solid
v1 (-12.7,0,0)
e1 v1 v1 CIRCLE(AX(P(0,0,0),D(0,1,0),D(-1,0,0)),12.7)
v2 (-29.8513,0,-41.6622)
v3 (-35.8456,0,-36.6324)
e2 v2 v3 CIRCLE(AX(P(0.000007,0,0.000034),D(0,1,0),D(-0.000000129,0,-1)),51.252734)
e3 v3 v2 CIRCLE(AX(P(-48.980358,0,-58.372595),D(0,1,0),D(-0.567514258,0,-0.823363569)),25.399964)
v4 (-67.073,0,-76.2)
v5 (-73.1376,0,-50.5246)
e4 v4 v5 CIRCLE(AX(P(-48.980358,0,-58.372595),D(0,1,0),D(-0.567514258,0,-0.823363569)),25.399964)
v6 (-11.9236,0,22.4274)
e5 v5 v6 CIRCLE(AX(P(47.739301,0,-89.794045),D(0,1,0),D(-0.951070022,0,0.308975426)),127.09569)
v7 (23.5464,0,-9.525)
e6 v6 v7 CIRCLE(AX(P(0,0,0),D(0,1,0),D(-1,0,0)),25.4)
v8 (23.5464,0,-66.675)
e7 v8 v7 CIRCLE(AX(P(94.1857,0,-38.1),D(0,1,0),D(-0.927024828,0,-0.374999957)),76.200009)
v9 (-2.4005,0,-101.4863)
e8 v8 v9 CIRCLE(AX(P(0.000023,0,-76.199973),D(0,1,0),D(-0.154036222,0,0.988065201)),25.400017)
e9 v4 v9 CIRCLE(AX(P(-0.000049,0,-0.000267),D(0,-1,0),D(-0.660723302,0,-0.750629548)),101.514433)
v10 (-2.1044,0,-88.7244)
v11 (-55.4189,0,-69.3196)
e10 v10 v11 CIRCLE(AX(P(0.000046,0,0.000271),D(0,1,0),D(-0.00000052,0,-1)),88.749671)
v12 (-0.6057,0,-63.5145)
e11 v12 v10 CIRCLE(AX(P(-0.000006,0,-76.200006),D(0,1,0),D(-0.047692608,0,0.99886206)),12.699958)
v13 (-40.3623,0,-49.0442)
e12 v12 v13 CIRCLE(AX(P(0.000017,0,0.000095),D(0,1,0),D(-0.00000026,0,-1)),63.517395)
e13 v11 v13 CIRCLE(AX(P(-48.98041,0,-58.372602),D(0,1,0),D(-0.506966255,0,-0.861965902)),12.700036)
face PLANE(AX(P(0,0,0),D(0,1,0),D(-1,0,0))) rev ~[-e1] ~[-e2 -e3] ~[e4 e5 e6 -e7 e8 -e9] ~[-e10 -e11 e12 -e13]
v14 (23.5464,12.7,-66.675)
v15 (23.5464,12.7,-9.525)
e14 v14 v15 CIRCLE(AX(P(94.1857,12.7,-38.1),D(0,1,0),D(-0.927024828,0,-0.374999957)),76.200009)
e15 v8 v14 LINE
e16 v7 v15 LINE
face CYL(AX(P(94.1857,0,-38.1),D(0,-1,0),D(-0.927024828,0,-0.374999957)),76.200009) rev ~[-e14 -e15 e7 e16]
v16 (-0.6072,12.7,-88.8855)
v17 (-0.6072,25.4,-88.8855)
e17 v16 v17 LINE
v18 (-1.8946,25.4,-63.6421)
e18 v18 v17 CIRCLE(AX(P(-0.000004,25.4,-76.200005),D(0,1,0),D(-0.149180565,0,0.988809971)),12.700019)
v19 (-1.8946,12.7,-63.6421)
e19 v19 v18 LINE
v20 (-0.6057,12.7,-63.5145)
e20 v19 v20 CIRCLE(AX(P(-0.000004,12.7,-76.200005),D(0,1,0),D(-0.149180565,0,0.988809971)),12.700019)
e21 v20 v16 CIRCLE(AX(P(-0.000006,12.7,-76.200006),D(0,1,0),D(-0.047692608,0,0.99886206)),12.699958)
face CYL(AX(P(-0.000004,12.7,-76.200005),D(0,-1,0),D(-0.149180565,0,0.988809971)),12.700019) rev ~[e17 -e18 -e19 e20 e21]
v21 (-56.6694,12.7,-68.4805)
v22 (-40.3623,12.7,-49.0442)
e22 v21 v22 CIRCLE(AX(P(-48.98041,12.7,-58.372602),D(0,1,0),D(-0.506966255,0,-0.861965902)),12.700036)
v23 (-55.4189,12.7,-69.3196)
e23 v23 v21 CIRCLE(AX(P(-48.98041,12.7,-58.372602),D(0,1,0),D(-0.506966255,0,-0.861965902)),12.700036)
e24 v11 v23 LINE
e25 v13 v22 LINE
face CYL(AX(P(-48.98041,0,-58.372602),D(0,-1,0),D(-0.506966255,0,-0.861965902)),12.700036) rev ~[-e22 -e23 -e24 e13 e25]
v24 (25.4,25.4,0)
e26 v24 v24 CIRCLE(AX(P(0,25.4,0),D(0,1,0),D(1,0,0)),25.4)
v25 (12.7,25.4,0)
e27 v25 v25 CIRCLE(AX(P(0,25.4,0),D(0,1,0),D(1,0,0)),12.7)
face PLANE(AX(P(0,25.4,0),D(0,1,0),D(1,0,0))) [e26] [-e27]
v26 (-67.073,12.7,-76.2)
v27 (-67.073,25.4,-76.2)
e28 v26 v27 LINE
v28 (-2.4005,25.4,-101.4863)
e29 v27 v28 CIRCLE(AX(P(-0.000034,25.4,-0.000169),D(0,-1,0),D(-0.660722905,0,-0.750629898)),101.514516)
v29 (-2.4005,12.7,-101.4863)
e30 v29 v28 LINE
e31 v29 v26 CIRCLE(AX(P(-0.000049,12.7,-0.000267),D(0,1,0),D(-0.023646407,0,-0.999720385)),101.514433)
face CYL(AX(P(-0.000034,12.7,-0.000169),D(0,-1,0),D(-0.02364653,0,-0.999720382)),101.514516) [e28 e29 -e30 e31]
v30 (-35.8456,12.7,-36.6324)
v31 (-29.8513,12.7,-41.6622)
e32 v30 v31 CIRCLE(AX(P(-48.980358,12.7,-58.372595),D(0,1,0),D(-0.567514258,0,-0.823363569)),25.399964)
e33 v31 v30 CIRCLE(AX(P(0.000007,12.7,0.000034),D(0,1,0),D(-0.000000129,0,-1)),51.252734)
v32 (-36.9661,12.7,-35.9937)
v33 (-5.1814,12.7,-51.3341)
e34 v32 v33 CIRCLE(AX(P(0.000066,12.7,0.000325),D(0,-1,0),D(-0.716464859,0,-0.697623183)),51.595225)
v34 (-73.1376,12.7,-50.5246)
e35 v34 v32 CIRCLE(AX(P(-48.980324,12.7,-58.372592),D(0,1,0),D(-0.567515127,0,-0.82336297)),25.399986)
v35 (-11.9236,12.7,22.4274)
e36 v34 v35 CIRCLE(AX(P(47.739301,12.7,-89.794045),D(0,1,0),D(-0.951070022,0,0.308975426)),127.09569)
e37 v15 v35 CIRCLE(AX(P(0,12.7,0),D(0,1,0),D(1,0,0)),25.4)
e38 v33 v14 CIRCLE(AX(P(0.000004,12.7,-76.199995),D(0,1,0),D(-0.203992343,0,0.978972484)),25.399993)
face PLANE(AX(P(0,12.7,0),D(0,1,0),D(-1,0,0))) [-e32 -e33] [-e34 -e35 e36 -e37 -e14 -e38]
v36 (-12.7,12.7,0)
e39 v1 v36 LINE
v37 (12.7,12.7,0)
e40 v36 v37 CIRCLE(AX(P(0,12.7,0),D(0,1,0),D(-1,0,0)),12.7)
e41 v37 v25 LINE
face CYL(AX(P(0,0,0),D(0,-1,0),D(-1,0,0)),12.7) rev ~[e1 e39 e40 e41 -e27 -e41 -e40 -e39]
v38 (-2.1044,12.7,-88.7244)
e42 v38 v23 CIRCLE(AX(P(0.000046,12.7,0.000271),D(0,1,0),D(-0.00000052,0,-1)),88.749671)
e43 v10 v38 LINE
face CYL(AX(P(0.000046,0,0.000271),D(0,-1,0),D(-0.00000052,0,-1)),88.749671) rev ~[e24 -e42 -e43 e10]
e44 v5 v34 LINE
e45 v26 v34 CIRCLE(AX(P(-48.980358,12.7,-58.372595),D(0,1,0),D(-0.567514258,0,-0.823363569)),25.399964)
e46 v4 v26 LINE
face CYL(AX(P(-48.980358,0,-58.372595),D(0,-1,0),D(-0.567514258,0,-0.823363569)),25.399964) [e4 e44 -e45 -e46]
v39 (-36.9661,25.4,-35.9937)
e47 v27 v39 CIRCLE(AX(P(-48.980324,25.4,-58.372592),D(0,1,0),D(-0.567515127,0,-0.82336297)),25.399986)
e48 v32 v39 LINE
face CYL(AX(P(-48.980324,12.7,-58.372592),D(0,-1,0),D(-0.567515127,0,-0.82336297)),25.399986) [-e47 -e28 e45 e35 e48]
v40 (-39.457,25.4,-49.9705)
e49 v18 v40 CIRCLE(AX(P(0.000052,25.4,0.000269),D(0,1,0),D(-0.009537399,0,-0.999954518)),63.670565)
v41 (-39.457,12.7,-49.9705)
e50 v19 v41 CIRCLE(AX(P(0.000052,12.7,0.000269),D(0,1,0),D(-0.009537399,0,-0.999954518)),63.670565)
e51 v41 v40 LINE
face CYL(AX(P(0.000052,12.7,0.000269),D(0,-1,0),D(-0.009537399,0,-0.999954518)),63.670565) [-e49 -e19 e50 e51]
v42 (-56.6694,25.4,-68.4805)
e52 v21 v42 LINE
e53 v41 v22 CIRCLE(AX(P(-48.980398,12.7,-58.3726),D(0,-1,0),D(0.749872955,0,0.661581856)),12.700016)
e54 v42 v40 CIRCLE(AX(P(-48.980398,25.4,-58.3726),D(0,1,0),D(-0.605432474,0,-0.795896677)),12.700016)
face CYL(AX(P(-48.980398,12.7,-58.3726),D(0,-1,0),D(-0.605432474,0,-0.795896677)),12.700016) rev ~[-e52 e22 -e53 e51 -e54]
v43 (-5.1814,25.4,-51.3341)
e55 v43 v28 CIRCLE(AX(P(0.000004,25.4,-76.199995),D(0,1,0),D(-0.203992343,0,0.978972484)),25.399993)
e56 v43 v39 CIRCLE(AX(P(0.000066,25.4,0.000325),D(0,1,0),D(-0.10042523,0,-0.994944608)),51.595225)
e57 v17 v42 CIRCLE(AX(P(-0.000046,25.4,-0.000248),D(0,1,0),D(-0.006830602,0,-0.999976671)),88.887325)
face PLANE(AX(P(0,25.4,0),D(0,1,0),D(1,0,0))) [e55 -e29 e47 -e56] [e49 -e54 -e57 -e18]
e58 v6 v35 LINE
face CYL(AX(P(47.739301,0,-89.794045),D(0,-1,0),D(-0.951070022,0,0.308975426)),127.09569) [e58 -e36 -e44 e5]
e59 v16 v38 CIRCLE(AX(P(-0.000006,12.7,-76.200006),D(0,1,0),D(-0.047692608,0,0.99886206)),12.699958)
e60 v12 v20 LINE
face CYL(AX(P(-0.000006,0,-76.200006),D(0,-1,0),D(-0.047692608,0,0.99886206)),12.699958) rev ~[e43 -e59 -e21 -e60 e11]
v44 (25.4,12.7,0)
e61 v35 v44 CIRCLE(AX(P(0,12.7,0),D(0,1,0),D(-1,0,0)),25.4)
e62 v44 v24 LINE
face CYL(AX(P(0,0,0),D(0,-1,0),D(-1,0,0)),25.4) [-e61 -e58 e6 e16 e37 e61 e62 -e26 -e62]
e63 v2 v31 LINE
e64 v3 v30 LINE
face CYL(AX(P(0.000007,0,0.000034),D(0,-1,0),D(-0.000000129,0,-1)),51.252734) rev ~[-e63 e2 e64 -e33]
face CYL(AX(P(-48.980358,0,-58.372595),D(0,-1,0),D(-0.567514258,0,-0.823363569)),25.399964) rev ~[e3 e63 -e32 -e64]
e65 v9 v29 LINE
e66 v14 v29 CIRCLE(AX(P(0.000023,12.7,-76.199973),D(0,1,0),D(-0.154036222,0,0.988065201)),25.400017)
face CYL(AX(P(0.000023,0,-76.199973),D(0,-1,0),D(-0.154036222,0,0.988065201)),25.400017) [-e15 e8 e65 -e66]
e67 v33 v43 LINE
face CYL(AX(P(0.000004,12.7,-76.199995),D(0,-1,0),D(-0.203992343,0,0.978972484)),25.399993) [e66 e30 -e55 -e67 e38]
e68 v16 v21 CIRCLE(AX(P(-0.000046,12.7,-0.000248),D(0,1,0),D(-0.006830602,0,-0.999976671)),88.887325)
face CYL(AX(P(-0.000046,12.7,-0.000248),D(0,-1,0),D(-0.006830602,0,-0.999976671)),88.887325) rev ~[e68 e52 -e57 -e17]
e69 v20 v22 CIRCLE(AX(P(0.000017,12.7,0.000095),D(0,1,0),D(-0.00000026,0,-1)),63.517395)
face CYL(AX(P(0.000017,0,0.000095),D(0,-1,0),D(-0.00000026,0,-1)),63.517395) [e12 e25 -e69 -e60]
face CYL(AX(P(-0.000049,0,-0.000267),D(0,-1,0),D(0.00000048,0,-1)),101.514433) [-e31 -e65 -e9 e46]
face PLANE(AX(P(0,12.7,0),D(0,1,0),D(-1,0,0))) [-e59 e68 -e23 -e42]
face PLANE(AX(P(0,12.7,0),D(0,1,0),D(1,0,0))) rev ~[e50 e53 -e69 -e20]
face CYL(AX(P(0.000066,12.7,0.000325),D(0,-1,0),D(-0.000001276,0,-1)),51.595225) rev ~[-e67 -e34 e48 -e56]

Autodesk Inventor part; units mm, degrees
ref_plane "YZ Plane" through (0, 0, 0) normal (1, 0, 0) x (0, 1, 0)
ref_plane "XZ Plane" through (0, 0, 0) normal (0, 1, 0) x (-1, 0, 0)
ref_plane "XY Plane" through (0, 0, 0) normal (0, 0, 1) x (1, 0, 0)
sketch "Sketch1" plane through (0, 0, 0) normal (0, 1, 0) x (-1, 0, 0)
  circle A0 centre (0, 0) radius 12.7
  circle A1 centre (0, 0) radius 25.4
  arc A2 (0.6057, -63.5145) -> (2.1044, -88.7244) centre (0, -76.2) ccw
  arc A3 (55.4189, -69.3196) -> (40.3623, -49.0442) centre (48.9804, -58.3726) ccw
  arc A4 (0, -88.7494) -> (55.4189, -69.3196) centre (0, 0) ccw
  arc A5 (0, -63.5173) -> (40.3623, -49.0442) centre (0, 0) ccw
  arc A6 (3.9125, -51.1031) -> (2.4005, -101.4863) centre (0, -76.2) ccw
  arc A7 (63.3952, -79.286) -> (29.8513, -41.6622) centre (48.9804, -58.3726) ccw
  arc A8 (0, -101.5147) -> (67.073, -76.2) centre (0, 0) ccw
  arc A9 (0, -51.2527) -> (35.8456, -36.6324) centre (0, 0) ccw
  arc A10 (73.1376, -50.5246) -> (11.9236, 22.4274) centre (-47.7394, -89.7941) ccw
  arc A11 (-23.5464, -66.675) -> (-23.5464, -9.525) centre (-94.1857, -38.1) ccw
  dimension "d0" = 25.4
  dimension "d1" = 50.8
  dimension "d5" = 25.4
  dimension "d6" = 25.4
  dimension "d7" = 50.8
  dimension "d8" = 50.8
extrude "Extrusion1" add sketch "Sketch1" along normal blind 12.7 contours A1 | A1 A10 A7 A9 A6 A11 | A7 A8 A6 A9
sketch "Sketch2" plane through (0, 12.7, 0) normal (0, 1, 0) x (1, 0, 0)
  circle A0 centre (0, 0) radius 12.7
  circle A1 centre (0, 0) radius 25.4
  arc A2 (-56.6694, 68.4805) -> (-39.457, 49.9705) centre (-48.9804, 58.3726) ccw
  arc A3 (-63.3952, 79.286) -> (-29.0277, 42.6547) centre (-48.9804, 58.3726) ccw
  arc A4 (-1.8946, 63.6421) -> (-0.6072, 88.8855) centre (0, 76.2) ccw
  arc A5 (-5.1814, 51.3341) -> (-2.4005, 101.4863) centre (0, 76.2) ccw
  arc A6 (-2.4005, 101.4863) -> (-67.073, 76.2) centre (0, 0) ccw
  arc A7 (0, 51.5949) -> (-36.9661, 35.9937) centre (0, 0) ccw
  arc A8 (-0.6072, 63.6674) -> (-42.3597, 47.5349) centre (0, 0) ccw
  arc A9 (-0.6072, 88.8855) -> (-58.1288, 67.2461) centre (0, 0) ccw
  dimension "d16" = 25.4
  dimension "d17" = 50.8
  dimension "d21" = 25.4
  dimension "d22" = 50.8
  dimension "d23" = 25.4
  dimension "d24" = 50.8
extrude "Extrusion2" add sketch "Sketch2" along normal blind 12.7 contours A1 | A6 A5 A7 A3
properties part number "4-1"
